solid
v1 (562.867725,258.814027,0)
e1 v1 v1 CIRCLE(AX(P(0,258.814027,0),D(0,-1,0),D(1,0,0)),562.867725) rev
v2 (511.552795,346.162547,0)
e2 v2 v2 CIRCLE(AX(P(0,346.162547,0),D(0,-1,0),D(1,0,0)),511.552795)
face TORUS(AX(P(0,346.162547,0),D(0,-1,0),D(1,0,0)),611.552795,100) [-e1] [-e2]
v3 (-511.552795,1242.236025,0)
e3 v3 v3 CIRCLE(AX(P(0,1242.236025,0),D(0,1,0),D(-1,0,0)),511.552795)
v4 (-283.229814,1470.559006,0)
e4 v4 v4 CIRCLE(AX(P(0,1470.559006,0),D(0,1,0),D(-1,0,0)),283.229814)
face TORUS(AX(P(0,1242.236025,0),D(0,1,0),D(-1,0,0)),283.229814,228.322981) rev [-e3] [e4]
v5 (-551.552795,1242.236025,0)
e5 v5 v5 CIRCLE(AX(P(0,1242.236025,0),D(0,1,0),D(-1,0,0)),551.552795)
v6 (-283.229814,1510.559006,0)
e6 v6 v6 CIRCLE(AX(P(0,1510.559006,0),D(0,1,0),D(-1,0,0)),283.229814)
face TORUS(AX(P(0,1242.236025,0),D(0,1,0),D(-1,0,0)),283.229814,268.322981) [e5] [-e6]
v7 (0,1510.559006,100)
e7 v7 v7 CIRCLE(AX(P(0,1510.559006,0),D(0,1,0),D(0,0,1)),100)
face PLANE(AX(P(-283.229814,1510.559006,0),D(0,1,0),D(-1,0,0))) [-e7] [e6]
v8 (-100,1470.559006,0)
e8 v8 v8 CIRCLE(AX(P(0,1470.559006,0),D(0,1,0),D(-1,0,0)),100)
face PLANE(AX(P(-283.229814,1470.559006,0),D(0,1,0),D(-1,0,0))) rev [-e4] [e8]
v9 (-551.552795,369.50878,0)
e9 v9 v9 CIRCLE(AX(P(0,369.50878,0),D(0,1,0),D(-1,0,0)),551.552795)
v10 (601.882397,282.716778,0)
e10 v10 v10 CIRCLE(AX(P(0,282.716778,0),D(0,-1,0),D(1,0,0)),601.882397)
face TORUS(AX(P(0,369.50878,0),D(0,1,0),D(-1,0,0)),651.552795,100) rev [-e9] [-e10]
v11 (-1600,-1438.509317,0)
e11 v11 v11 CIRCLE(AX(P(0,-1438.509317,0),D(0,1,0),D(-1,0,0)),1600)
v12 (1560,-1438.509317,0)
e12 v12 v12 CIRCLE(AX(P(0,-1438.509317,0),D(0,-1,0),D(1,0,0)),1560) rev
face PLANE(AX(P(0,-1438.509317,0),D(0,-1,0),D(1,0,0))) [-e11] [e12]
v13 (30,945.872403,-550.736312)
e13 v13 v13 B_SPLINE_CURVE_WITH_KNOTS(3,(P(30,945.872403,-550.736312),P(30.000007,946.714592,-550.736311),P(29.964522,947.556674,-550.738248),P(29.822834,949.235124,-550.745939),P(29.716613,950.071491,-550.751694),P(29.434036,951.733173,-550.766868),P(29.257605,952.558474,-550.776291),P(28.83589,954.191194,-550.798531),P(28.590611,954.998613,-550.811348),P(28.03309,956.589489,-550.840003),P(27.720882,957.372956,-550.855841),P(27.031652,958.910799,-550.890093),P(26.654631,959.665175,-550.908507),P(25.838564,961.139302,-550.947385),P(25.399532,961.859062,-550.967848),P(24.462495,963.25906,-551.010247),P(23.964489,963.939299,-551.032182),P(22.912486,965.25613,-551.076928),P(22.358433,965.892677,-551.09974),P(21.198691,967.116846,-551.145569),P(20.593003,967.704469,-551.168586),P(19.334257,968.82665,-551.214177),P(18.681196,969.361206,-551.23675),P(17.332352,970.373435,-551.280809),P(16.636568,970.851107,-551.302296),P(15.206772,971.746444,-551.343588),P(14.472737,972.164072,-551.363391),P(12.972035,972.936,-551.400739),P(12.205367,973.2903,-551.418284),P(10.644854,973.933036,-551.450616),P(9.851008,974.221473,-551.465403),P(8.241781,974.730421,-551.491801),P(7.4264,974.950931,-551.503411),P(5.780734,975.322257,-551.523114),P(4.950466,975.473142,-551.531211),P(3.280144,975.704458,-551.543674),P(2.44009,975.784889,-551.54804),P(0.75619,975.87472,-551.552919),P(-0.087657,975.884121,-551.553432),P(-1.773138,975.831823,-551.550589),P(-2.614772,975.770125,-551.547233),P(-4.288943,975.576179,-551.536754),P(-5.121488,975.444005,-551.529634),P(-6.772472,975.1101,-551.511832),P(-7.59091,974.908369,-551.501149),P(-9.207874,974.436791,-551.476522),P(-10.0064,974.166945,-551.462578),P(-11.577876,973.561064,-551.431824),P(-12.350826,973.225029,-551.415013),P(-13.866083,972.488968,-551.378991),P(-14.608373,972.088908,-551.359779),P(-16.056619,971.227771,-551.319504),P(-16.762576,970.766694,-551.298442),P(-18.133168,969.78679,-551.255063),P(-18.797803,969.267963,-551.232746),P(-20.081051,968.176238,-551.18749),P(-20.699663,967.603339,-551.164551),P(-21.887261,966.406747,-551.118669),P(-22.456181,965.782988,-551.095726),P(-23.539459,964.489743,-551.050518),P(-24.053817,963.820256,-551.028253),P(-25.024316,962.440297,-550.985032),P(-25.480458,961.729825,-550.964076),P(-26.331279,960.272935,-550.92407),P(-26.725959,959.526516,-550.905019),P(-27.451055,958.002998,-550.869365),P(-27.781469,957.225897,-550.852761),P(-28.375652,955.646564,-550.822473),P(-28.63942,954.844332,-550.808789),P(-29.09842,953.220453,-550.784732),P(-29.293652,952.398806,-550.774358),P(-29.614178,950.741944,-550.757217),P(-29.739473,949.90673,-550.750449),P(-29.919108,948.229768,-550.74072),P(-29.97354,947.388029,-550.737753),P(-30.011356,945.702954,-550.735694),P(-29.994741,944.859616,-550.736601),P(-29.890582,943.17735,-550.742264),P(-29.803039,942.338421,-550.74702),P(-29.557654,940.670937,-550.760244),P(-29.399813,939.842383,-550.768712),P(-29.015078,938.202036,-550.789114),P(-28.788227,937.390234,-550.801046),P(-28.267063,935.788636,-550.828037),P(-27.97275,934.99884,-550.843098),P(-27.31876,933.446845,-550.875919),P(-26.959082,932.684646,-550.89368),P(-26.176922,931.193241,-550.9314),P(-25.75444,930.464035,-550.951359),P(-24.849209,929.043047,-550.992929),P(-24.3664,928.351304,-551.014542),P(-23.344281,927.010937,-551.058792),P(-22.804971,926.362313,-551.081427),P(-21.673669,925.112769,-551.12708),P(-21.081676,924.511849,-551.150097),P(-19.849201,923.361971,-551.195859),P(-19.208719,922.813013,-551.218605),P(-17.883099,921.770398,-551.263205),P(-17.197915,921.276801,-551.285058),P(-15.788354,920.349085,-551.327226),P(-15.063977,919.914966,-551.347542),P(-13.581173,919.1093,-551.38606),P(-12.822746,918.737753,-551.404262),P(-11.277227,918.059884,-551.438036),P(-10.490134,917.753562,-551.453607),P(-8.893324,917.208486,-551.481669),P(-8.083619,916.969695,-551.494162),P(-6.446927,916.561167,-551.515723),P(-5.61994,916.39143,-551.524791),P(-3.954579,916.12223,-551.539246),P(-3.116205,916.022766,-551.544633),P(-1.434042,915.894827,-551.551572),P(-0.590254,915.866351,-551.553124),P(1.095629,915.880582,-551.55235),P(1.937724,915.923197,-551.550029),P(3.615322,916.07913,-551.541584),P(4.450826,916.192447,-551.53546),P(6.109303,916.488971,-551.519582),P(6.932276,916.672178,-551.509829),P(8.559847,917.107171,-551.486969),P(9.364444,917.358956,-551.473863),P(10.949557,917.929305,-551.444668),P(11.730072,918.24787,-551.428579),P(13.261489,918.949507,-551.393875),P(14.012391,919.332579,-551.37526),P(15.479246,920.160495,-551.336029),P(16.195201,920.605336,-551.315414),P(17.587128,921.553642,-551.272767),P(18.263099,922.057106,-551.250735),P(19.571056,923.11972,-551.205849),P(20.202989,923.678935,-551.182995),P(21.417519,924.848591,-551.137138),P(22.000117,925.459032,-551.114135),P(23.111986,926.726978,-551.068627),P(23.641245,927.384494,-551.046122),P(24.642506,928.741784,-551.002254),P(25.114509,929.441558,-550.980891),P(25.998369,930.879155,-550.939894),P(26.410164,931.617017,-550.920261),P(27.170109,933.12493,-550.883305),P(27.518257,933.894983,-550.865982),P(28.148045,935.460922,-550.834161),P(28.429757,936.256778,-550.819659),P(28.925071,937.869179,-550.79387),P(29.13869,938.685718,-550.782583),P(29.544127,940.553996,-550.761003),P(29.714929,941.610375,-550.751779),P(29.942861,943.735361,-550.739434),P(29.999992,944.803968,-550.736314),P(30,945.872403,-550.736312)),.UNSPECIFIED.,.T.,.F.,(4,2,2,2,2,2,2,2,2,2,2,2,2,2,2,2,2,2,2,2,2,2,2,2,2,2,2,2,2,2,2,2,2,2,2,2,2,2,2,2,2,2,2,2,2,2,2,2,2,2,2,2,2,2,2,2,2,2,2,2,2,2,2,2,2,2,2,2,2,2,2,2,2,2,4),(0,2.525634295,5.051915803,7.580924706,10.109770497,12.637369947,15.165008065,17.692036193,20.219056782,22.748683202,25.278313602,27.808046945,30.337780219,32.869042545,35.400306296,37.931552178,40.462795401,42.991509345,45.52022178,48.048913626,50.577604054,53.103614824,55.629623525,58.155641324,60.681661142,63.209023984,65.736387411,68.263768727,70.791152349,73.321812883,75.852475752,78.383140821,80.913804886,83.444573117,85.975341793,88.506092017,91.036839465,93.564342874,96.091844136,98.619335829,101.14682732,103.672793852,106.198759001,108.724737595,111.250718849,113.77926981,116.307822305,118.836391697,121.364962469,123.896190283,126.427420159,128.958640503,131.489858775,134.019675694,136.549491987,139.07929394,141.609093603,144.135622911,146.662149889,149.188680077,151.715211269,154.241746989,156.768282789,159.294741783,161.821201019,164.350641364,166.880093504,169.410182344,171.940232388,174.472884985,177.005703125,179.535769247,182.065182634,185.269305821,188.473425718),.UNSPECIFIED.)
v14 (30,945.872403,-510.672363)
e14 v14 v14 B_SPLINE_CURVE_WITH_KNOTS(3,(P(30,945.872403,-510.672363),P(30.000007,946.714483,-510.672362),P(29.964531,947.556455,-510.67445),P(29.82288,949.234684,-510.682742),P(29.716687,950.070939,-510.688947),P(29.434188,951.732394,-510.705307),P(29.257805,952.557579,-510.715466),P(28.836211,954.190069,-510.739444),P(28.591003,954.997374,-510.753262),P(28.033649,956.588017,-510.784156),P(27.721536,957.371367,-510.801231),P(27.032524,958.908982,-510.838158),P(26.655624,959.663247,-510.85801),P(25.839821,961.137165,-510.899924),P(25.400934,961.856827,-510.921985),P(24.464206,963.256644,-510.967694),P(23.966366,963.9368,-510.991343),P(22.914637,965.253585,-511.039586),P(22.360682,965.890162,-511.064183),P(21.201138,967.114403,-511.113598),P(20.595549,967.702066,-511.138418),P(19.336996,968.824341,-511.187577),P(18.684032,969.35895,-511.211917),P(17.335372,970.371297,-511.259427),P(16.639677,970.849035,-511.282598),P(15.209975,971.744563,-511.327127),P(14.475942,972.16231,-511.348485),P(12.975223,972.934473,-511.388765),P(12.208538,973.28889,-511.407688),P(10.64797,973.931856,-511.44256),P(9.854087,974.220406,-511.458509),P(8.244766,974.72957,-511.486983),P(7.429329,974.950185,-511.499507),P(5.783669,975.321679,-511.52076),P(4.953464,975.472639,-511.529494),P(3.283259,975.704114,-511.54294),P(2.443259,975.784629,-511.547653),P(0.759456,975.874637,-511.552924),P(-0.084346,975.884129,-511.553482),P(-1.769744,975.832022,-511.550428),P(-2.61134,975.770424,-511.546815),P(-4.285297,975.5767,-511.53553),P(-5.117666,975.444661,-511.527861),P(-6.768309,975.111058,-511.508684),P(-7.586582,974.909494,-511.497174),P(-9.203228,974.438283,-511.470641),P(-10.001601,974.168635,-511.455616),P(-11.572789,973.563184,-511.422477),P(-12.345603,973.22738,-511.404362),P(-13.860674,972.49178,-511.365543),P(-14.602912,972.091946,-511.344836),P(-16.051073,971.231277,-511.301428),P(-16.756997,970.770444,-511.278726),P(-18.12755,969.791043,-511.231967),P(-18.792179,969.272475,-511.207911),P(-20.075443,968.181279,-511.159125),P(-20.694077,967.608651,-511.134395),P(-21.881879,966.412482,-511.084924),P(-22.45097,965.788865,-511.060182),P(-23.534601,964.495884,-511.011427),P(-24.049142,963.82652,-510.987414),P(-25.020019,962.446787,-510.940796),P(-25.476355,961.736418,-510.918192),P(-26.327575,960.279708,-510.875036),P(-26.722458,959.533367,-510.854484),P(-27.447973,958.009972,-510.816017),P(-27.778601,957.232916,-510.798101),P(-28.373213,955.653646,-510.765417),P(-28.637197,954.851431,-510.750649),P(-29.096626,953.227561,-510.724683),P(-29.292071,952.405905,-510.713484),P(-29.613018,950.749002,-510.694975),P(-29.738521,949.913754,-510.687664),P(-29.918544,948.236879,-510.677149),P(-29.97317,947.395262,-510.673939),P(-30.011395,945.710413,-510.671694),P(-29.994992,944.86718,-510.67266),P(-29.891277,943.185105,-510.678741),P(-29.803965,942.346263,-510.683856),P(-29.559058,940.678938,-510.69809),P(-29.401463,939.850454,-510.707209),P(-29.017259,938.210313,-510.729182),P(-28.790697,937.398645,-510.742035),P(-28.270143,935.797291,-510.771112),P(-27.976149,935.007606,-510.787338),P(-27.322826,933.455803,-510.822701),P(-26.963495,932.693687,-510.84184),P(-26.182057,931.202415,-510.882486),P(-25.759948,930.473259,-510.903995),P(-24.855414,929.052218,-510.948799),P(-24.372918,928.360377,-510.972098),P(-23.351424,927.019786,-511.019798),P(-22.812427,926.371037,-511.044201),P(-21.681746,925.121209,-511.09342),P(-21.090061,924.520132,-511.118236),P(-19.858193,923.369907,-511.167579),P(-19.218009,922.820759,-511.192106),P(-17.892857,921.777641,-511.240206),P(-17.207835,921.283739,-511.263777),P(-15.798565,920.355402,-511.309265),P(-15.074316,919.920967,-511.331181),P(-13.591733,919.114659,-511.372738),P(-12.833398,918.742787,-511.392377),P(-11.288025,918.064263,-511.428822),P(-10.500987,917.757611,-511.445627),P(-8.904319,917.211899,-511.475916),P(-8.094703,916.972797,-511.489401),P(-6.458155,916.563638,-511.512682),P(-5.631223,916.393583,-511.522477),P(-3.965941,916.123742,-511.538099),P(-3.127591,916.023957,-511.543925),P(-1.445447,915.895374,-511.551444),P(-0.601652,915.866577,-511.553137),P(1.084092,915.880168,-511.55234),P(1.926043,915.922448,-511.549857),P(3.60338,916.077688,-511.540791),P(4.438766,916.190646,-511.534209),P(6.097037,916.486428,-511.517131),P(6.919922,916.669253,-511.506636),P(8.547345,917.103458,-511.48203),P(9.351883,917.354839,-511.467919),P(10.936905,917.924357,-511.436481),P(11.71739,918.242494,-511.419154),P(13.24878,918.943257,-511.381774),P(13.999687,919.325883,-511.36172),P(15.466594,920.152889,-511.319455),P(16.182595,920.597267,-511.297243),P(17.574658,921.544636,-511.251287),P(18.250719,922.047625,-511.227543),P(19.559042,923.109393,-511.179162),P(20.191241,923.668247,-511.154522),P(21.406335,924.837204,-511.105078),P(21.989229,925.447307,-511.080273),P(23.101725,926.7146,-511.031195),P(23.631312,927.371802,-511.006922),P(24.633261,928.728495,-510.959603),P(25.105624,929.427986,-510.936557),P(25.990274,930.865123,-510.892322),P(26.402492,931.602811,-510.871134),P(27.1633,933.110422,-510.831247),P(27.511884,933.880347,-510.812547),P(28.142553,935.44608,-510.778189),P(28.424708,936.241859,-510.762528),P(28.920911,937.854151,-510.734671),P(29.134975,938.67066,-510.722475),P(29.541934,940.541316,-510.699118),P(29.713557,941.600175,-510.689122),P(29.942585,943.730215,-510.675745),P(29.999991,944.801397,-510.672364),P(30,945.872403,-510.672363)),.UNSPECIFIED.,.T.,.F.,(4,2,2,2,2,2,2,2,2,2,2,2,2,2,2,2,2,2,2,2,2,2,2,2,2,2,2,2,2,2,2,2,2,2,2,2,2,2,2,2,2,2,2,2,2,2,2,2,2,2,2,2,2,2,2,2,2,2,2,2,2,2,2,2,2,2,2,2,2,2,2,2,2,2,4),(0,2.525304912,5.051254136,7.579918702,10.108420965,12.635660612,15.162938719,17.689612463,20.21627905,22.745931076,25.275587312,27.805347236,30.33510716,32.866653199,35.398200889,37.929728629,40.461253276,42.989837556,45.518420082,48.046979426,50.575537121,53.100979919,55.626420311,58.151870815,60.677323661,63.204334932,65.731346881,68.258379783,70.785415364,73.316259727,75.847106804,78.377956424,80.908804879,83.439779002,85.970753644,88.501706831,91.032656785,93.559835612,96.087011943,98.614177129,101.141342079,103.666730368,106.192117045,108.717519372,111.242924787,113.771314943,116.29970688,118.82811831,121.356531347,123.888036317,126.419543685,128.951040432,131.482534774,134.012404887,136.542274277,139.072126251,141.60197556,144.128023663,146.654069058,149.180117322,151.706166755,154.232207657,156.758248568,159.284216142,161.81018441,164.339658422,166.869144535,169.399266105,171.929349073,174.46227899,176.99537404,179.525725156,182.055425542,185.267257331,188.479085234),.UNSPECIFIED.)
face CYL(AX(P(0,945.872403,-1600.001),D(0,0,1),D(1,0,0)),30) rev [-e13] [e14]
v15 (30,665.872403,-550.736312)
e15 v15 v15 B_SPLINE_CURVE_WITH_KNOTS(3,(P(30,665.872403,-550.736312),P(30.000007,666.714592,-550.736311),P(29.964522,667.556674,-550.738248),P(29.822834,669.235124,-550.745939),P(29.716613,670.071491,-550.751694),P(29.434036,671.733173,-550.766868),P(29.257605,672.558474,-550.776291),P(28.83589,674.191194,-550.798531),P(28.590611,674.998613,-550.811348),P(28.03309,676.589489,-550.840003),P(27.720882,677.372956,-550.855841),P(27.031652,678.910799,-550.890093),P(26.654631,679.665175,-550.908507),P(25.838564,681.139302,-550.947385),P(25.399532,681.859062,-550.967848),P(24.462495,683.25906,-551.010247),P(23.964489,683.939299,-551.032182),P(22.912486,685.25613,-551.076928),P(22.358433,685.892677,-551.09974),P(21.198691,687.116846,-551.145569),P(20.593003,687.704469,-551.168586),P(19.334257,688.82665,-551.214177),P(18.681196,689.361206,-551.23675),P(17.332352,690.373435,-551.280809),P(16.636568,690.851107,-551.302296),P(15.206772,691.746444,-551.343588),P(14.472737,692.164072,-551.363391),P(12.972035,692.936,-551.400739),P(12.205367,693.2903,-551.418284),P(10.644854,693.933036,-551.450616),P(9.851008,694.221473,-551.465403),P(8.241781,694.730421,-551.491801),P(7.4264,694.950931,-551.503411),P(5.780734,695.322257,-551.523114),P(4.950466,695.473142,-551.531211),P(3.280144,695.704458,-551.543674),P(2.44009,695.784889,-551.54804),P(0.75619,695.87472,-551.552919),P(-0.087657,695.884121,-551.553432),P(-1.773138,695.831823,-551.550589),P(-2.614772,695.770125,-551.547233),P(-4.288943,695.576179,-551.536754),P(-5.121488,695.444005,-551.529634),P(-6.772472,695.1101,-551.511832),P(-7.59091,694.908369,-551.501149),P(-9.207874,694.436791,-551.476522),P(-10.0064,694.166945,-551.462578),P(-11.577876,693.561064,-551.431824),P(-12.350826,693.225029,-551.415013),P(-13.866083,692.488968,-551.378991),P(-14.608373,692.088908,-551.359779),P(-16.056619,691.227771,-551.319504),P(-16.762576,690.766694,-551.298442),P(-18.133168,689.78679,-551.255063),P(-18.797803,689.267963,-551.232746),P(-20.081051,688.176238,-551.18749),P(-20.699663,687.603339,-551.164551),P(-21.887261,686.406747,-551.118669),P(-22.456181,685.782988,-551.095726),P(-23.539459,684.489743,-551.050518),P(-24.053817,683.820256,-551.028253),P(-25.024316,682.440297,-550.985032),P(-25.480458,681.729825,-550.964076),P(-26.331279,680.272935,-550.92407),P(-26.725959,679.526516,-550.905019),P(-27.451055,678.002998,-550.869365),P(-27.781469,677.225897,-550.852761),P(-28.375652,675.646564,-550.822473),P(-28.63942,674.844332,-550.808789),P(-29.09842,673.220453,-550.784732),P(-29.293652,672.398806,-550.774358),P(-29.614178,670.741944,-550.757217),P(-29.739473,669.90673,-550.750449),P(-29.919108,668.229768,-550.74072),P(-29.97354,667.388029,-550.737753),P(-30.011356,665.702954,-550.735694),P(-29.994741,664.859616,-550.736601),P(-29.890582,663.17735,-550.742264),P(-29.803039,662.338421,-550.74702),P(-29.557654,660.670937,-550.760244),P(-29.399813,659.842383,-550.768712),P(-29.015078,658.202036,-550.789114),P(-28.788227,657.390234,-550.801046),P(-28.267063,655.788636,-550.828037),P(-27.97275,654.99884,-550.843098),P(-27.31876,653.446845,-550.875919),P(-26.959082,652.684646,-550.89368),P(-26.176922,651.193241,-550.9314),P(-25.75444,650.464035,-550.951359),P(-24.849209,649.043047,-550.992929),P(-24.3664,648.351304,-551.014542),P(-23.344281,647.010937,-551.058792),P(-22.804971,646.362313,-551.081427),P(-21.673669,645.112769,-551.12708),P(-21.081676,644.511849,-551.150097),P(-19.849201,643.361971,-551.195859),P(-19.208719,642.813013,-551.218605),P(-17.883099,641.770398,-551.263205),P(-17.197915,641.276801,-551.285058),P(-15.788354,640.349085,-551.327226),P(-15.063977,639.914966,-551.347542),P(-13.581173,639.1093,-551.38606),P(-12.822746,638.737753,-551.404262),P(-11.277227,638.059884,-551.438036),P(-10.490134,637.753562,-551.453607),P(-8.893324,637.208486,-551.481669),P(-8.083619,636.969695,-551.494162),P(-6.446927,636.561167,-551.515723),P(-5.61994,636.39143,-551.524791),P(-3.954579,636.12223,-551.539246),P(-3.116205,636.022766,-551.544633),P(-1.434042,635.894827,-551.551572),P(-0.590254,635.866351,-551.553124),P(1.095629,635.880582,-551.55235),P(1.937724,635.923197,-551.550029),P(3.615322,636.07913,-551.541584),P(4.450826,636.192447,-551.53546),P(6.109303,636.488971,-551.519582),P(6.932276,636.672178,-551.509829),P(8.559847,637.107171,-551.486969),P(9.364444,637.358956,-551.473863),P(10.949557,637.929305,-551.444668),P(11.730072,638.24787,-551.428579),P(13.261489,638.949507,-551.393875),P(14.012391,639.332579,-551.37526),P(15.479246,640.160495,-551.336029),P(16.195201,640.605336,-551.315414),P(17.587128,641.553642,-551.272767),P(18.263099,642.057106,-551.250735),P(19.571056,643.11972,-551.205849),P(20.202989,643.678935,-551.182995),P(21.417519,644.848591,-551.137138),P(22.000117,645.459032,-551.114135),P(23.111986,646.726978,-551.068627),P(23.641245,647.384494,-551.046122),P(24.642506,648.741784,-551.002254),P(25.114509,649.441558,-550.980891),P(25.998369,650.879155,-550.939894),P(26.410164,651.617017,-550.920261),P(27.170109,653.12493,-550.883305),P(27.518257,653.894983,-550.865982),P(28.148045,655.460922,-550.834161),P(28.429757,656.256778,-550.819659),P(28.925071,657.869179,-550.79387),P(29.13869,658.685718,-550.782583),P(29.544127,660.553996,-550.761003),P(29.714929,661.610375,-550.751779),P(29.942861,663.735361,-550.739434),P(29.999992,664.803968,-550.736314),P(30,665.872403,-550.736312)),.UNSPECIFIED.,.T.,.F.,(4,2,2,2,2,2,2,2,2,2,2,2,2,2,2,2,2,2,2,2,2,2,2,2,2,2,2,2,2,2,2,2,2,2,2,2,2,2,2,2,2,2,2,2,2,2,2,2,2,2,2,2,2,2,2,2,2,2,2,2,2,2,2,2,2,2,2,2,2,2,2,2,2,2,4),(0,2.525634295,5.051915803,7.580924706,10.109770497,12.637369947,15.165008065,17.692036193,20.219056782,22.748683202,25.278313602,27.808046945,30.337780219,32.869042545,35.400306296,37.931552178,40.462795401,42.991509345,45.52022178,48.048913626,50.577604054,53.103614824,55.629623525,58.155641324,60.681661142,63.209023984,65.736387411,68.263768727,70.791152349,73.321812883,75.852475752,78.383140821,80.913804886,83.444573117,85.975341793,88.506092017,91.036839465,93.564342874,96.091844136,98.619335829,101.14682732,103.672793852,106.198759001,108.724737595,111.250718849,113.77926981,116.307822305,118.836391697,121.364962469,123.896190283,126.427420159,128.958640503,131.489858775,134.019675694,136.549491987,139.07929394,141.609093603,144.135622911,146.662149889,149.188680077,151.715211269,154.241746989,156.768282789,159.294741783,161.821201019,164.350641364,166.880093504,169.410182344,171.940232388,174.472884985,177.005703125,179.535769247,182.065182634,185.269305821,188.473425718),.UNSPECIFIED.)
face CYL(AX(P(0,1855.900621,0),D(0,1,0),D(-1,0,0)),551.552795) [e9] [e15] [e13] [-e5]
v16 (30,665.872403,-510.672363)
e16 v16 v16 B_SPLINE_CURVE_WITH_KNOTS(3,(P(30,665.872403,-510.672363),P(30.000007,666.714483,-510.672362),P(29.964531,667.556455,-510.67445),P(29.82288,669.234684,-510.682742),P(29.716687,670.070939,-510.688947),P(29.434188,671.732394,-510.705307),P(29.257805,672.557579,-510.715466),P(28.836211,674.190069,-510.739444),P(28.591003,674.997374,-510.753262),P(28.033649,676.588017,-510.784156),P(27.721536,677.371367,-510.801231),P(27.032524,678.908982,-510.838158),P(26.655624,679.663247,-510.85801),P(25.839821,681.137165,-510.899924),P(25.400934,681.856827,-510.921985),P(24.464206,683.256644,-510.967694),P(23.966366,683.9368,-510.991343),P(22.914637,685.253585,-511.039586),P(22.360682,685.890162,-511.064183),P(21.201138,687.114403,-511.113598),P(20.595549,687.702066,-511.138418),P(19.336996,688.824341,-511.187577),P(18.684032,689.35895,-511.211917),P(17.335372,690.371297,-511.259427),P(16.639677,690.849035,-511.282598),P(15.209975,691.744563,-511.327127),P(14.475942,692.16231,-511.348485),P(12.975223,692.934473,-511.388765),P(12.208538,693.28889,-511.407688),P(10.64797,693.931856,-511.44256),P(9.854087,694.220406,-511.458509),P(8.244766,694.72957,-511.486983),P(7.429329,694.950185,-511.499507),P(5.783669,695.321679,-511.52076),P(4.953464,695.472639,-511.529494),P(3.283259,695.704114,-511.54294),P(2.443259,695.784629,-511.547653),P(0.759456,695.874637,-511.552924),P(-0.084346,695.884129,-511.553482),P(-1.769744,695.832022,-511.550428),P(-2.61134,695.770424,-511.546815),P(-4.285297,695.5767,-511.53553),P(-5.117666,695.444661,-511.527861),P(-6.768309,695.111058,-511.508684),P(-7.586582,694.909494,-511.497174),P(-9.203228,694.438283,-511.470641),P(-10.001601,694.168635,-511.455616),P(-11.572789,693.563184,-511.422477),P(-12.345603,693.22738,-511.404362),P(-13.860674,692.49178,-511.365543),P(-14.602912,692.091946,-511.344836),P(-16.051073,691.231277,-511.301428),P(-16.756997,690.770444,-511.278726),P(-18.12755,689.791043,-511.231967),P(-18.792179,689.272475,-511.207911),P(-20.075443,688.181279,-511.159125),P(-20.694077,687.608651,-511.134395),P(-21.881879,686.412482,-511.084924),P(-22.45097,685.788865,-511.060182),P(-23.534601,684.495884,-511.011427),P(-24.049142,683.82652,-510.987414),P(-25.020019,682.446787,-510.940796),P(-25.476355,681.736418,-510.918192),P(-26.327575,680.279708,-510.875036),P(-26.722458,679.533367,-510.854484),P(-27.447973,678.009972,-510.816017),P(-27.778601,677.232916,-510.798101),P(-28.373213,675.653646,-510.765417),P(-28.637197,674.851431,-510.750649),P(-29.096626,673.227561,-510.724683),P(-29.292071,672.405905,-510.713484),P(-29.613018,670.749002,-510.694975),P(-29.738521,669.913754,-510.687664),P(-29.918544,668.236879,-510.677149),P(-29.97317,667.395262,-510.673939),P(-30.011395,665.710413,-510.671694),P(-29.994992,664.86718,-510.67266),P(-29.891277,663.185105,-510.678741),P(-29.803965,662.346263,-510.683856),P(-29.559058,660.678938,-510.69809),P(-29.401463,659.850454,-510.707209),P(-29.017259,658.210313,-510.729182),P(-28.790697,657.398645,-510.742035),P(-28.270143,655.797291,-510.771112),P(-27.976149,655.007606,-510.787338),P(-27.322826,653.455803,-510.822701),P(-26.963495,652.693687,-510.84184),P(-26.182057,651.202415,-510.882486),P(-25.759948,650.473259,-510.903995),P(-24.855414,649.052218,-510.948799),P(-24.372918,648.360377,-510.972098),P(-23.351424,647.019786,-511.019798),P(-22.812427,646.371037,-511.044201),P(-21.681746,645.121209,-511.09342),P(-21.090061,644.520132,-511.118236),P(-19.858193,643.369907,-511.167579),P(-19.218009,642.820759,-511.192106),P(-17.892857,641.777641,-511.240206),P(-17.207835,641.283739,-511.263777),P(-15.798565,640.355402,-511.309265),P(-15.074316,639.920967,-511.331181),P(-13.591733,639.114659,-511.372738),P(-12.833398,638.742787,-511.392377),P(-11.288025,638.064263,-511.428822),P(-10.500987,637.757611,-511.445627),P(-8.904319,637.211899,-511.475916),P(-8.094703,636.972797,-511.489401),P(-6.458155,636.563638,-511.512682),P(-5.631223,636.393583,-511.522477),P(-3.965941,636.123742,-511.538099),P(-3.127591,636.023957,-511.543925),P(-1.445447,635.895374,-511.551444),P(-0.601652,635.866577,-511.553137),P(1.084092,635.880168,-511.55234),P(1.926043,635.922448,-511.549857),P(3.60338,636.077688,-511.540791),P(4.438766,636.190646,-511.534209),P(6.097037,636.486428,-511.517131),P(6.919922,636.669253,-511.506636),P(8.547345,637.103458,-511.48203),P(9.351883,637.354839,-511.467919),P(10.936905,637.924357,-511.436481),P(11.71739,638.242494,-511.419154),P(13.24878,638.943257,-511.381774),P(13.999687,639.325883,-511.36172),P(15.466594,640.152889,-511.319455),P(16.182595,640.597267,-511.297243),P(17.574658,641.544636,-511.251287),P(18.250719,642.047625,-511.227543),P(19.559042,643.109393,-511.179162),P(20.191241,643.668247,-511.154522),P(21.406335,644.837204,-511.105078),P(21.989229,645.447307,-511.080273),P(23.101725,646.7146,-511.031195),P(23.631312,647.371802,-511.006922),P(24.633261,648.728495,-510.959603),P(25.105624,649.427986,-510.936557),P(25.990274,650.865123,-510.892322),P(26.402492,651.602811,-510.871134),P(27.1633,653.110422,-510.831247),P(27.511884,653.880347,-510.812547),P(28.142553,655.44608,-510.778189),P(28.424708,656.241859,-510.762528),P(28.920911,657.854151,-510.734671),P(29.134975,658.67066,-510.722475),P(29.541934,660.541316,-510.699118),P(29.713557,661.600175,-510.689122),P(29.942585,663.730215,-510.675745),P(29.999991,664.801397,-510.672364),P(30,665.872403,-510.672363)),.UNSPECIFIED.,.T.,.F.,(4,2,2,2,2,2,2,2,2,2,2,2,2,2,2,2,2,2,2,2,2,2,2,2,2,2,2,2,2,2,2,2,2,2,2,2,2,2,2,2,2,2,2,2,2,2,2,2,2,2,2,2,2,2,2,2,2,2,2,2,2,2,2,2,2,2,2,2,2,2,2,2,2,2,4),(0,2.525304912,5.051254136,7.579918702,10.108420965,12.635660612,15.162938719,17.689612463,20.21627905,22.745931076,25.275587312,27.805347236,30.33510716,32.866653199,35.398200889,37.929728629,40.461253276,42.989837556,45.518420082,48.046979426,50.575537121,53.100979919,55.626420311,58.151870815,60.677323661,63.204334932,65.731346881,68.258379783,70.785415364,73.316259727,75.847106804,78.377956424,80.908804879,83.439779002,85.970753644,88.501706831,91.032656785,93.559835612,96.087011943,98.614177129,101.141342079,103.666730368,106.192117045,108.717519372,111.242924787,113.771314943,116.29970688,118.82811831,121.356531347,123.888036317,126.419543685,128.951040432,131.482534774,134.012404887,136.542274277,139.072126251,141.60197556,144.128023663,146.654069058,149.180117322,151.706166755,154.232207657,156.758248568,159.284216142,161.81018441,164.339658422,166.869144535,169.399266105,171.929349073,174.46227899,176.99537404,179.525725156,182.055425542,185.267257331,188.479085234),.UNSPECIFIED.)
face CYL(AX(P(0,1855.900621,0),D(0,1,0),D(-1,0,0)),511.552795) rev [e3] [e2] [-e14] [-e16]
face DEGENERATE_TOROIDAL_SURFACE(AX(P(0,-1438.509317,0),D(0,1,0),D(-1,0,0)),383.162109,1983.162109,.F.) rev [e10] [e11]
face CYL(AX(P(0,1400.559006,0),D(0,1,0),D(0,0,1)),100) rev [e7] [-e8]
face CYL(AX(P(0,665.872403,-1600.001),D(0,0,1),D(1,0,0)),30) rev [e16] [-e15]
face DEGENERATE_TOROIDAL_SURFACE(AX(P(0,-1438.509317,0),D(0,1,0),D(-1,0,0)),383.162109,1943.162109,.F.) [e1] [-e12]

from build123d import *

# Parameters (mm, degrees)
SKETCH2_R               = 100
CUT_EXTRUDE2_DEPTH      = 110
FILLET1_R               = 100
FILLET2_R               = 100
CUT_EXTRUDE3_REACH      = 2722.623
CUT_EXTRUDE3_END_RADIUS = 551.552795031
SKETCH3_R               = 30


# Read off the part's stored shape, not the designer's step: Shell3
with BuildPart() as part:
    # Sketch1 → Revolve1 (revolve)
    with BuildSketch(Plane.XY):
        with BuildLine():
            Line((0, 1510.559006211), (0, -1438.50931677))
            Line((0, -1438.50931677), (-1600, -1438.50931677))
            ThreePointArc((-1600, -1438.50931677), (-1317.811601989, -418.891552598), (-551.552795031, 310.559006211))
            Line((-551.552795031, 310.559006211), (-551.552795031, 1242.236024845))
            ThreePointArc((-551.552795031, 1242.236024845), (-472.962813337, 1431.969024517), (-283.229813665, 1510.559006211))
            Line((-283.229813665, 1510.559006211), (0, 1510.559006211))
        make_face()
    revolve(axis=Axis((0, 1855.900621118, 0), (0, -1, 0)))

    # Shell3 outline → Shell3 (revolve, cut)
    with BuildSketch(Plane.XY):
        with BuildLine():
            Line((283.229813665, 1470.559006211), (0, 1470.559006211))
            Line((0, 1470.559006211), (0, -1438.50931677))
            Line((0, -1438.50931677), (1560, -1438.50931677))
            ThreePointArc((1560, -1438.50931677), (1277.328041786, -429.226679984), (511.552795031, 286.415093765))
            Line((511.552795031, 286.415093765), (511.552795031, 1242.236024845))
            ThreePointArc((511.552795031, 1242.236024845), (444.67854209, 1403.68475327), (283.229813665, 1470.559006211))
        make_face()
    revolve(axis=Axis((0, 0, 0), (0, 1, 0)), mode=Mode.SUBTRACT)

    # Sketch2 → Cut-Extrude2 (cut)
    with BuildSketch(Plane(origin=(0, 1510.559006211, 0), x_dir=(1, 0, 0), z_dir=(0, 1, 0))):
        with Locations(Location((0, 0, 0), (0, 0, 270))):
            Circle(SKETCH2_R)
    extrude(amount=-CUT_EXTRUDE2_DEPTH, mode=Mode.SUBTRACT)

    # Fillet1
    fillet1_edges = [part.edges().sort_by_distance(p)[0] for p in [
        (551.552795031, 310.559006211, 0),
    ]]
    fillet(fillet1_edges, radius=FILLET1_R)

    # Fillet2
    fillet2_edges = [part.edges().sort_by_distance(p)[0] for p in [
        (-511.552795031, 286.415093765, 0),
    ]]
    fillet(fillet2_edges, radius=FILLET2_R)

    # Cut-Extrude3: up to this cylinder (the profile starts inside it)
    cut_extrude3_end = Plane(origin=(0, 805.872403, 0), z_dir=(0, 1, 0)) * Cylinder(CUT_EXTRUDE3_END_RADIUS, 6829.351590062, mode=Mode.PRIVATE)
    # Sketch3 → Cut-Extrude3 (cut, up to the surface)
    with BuildSketch(Plane.XY, mode=Mode.PRIVATE) as cut_extrude3_sk1:
        with Locations((0, 945.872402589)):
            Circle(SKETCH3_R)
    cut_extrude3_tool1 = extrude(cut_extrude3_sk1.sketch, amount=-CUT_EXTRUDE3_REACH, mode=Mode.PRIVATE) & cut_extrude3_end
    add(cut_extrude3_tool1.solids().sort_by_distance((0, 945.872403, 0))[0], mode=Mode.SUBTRACT)
    # Sketch3 → Cut-Extrude3 (cut, up to the surface)
    with BuildSketch(Plane.XY, mode=Mode.PRIVATE) as cut_extrude3_sk2:
        with Locations((0, 665.872402589)):
            Circle(SKETCH3_R)
    cut_extrude3_tool2 = extrude(cut_extrude3_sk2.sketch, amount=-CUT_EXTRUDE3_REACH, mode=Mode.PRIVATE) & cut_extrude3_end
    add(cut_extrude3_tool2.solids().sort_by_distance((0, 665.872403, 0))[0], mode=Mode.SUBTRACT)


solid = part.part
